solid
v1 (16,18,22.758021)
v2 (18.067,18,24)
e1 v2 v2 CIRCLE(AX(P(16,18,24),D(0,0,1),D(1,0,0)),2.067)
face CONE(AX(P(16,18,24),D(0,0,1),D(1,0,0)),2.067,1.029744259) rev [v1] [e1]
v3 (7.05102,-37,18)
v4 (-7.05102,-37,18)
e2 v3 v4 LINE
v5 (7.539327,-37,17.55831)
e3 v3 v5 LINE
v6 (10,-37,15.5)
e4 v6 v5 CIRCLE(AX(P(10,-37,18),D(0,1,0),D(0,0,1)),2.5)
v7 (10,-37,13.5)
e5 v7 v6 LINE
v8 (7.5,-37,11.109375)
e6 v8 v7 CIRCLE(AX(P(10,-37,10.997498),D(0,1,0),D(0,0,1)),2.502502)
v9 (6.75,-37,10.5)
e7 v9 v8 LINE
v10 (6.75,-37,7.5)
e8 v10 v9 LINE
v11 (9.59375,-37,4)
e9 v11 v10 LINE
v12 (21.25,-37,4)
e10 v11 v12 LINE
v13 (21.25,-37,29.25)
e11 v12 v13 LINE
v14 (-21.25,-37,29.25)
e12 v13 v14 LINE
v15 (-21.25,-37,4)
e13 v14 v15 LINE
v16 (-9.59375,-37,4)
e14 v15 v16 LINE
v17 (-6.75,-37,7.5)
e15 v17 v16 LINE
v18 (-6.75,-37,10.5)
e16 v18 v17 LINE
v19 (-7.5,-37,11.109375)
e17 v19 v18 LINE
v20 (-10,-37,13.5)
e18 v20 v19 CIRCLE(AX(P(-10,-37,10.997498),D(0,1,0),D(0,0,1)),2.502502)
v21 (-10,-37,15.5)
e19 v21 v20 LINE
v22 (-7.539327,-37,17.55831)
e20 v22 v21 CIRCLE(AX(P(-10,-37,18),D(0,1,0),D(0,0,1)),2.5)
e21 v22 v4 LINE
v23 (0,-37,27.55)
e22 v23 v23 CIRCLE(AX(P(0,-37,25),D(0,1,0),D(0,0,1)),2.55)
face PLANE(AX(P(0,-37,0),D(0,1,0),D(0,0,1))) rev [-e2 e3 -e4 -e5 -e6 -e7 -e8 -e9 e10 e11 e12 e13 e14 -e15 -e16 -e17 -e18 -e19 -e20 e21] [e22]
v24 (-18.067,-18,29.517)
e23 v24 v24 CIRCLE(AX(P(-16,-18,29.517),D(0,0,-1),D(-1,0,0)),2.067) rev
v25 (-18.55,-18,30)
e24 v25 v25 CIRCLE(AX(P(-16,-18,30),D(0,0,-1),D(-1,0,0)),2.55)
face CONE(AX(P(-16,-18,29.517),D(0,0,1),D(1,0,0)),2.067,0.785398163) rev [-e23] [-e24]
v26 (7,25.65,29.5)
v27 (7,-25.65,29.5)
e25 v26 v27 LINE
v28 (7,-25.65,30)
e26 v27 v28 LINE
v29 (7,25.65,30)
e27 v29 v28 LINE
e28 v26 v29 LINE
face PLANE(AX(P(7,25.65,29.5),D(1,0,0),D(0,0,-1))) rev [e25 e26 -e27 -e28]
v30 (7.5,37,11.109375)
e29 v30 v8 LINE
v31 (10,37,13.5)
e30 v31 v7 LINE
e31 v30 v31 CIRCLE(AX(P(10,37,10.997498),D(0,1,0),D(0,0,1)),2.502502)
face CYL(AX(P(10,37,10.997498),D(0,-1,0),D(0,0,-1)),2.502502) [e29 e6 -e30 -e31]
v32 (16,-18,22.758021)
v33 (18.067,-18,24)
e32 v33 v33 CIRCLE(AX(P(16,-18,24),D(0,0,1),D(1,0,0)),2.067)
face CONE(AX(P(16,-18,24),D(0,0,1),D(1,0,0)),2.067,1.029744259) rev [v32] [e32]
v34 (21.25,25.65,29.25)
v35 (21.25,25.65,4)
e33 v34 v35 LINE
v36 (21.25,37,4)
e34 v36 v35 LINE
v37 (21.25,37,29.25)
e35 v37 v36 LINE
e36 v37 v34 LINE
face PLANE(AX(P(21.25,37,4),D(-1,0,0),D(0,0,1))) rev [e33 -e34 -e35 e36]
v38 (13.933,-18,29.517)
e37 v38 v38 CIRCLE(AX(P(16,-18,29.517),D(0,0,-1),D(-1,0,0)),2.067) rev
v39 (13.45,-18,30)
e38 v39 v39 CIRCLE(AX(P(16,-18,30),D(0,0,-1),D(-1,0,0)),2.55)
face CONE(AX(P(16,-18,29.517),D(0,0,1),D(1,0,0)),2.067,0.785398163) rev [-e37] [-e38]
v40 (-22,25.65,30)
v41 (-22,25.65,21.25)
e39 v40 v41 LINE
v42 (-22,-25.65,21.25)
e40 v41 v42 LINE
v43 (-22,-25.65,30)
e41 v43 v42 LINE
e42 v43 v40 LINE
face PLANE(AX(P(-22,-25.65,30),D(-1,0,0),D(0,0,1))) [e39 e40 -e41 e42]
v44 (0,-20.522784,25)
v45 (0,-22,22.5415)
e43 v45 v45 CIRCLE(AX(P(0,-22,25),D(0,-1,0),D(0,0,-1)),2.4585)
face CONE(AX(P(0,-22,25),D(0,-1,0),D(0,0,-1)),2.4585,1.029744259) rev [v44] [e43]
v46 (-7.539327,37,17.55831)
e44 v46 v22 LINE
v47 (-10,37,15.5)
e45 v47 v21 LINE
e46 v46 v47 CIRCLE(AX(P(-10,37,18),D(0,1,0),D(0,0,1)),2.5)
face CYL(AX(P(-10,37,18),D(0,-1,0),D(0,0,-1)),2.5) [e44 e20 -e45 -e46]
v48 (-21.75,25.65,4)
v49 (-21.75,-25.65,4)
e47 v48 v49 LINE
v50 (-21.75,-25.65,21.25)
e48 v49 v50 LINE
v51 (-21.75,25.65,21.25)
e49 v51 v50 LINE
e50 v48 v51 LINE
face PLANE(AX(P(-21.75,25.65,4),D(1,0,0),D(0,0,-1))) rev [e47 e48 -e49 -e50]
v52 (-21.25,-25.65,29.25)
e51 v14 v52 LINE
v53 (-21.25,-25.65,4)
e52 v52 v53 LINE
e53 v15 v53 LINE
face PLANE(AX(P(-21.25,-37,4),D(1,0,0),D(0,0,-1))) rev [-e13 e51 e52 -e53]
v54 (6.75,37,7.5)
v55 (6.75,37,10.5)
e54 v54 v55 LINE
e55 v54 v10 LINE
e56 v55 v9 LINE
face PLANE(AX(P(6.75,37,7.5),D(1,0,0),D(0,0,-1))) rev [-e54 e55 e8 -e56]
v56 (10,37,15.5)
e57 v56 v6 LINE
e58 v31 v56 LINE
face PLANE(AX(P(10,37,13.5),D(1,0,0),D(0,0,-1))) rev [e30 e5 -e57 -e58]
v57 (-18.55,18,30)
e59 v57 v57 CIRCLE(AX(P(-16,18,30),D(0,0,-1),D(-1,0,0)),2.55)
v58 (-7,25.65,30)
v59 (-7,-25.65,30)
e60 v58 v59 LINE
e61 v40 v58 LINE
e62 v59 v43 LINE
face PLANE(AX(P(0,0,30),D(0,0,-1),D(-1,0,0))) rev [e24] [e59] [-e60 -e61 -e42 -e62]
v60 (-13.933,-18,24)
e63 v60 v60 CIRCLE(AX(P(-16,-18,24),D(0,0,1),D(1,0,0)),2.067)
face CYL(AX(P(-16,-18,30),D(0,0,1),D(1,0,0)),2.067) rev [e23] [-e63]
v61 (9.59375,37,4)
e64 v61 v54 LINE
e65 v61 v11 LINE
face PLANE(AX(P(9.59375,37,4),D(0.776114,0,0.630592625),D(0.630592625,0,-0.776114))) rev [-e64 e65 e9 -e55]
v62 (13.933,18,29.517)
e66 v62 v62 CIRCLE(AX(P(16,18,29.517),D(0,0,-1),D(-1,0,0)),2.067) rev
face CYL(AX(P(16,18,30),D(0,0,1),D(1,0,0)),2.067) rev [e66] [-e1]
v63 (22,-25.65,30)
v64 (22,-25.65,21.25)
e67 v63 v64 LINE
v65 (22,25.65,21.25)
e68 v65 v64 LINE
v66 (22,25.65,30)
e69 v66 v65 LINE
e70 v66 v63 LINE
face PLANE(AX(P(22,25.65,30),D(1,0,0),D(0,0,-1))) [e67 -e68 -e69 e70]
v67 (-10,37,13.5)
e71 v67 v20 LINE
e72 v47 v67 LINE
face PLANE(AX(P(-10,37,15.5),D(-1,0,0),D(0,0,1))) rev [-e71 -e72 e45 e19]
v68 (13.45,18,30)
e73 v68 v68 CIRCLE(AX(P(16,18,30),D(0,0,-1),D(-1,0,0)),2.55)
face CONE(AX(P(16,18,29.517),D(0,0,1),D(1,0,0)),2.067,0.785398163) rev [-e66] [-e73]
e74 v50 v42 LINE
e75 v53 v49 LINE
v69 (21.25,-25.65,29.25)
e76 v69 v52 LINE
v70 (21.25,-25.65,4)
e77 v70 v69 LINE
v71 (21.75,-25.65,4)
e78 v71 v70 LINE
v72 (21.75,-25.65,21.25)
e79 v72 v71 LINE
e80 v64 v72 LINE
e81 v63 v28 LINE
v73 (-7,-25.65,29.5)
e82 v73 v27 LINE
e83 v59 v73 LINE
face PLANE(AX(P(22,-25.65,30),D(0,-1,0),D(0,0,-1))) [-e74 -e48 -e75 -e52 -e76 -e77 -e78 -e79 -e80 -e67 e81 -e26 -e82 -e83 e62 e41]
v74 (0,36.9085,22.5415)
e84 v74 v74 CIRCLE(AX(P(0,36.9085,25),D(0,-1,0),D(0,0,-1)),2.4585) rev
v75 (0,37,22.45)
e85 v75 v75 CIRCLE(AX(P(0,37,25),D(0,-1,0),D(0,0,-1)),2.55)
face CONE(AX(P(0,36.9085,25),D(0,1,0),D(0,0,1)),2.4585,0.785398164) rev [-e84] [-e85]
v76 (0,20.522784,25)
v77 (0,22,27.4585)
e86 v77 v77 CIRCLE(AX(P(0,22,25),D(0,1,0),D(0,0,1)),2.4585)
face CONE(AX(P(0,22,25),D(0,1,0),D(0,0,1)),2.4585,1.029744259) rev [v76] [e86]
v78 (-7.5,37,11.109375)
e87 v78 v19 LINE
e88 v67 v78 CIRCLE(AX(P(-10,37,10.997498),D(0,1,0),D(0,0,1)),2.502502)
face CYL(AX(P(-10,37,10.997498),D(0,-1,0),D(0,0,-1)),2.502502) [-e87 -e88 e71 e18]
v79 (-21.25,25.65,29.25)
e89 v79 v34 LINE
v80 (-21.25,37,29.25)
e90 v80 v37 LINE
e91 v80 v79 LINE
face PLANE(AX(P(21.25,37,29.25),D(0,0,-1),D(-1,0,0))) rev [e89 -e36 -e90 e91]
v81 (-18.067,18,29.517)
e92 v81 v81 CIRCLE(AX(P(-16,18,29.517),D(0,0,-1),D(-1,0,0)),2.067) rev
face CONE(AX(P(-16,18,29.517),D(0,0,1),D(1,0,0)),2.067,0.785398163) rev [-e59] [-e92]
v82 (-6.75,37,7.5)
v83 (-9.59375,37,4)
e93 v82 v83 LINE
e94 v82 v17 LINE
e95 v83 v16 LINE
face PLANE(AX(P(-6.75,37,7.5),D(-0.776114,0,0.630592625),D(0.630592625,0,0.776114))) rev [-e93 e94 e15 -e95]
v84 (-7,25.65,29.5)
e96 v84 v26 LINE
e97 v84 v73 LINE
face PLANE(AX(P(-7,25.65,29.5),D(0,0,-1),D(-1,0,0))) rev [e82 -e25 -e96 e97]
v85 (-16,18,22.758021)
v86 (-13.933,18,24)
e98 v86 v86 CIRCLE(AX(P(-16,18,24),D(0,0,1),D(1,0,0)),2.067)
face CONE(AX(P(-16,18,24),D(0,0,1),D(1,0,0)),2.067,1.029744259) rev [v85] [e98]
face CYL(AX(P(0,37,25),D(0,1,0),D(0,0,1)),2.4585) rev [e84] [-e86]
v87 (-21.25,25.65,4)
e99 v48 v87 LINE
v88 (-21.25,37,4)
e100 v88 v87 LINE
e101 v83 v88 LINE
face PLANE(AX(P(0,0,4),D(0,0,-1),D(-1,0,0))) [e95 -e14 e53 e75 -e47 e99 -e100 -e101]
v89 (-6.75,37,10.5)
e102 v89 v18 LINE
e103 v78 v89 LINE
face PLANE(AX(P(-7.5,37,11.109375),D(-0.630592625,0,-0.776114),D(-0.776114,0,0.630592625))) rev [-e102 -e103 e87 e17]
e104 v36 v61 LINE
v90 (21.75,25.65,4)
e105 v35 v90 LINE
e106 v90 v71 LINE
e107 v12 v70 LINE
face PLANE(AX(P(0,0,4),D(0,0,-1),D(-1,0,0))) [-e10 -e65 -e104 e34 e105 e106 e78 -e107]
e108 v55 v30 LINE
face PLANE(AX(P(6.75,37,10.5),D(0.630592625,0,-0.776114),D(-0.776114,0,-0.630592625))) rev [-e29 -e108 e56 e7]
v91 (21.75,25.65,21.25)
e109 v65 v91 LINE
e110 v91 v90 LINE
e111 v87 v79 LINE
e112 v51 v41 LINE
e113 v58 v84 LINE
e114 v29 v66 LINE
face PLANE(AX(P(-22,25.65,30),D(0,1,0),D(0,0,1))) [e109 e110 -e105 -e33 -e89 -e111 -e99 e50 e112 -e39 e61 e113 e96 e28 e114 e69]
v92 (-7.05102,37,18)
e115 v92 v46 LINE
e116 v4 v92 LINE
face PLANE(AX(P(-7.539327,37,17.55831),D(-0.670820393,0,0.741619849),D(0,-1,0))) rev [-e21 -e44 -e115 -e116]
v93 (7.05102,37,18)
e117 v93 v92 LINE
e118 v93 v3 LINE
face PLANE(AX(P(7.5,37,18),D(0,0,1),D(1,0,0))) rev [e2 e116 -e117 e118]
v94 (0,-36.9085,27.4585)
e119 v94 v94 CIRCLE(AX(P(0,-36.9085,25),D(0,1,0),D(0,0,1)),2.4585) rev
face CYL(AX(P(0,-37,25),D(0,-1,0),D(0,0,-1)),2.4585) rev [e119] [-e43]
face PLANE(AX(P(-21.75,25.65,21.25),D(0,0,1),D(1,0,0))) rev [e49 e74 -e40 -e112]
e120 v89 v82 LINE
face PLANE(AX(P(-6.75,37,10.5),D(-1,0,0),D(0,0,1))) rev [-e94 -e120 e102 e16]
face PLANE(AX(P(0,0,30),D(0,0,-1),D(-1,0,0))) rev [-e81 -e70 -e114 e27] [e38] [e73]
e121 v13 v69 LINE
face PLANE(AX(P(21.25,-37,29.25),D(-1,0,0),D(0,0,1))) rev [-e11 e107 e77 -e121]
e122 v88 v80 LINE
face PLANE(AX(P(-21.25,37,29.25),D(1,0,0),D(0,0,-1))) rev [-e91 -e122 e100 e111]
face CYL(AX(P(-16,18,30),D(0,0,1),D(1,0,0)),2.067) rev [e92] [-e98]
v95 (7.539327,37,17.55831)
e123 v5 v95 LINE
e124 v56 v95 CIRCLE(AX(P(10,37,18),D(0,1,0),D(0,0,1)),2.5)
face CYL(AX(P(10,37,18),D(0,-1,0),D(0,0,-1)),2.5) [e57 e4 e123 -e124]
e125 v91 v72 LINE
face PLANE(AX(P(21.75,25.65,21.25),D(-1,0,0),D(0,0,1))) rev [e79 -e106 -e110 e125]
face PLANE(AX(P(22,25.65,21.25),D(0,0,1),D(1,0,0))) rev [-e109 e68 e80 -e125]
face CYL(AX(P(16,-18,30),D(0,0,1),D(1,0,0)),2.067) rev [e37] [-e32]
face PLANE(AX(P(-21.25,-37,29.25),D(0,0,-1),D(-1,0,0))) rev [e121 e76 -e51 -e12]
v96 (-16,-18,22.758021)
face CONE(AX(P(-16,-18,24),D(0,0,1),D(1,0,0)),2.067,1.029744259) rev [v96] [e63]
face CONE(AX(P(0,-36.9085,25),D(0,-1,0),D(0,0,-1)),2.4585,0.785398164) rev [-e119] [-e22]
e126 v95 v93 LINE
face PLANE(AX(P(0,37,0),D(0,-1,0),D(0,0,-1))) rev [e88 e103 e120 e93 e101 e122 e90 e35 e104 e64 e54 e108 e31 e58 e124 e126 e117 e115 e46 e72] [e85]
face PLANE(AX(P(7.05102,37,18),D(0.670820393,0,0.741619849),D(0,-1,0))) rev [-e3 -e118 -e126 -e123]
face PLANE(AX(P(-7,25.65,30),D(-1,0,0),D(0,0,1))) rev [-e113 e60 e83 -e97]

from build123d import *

# Parameters (mm, degrees)
SKIZZE1_W                       = 44
SKIZZE1_H                       = 51.3
AUFSATZ_LINEAR_AUSTRAGEN1_DEPTH = 26
SKIZZE2_W                       = 0.25
SKIZZE2_H                       = 17.25
SCHNITT_LINEAR_AUSTRAGEN1_DEPTH = 64.369472146
SKIZZE3_W                       = 14
SKIZZE3_H                       = 0.5
SCHNITT_LINEAR_AUSTRAGEN2_DEPTH = 64.369472146
SKIZZE4_W                       = 0.25
SKIZZE4_H                       = 17.25
SCHNITT_LINEAR_AUSTRAGEN3_DEPTH = 51.3
SKIZZE5_W                       = 42.5
SKIZZE5_H                       = 25.25
AUFSATZ_LINEAR_AUSTRAGEN2_DEPTH = 11.35
SKIZZE6_W                       = 42.5
SKIZZE6_H                       = 25.25
AUFSATZ_LINEAR_AUSTRAGEN3_DEPTH = 11.35
SCHNITT_LINEAR_AUSTRAGEN4_DEPTH = 83.825116963
BOHRUNG1_D                      = 4.917
BOHRUNG1_DEPTH                  = 15
BOHRUNG1_TIP                    = 1.477215832
BOHRUNG2_D                      = 4.917
BOHRUNG2_DEPTH                  = 15
BOHRUNG2_TIP                    = 1.477215832
DURCHGANGSLOCH_F_R_M3_51_D      = 4.134
DURCHGANGSLOCH_F_R_M3_51_DEPTH  = 6
DURCHGANGSLOCH_F_R_M3_51_TIP    = 1.2419789
FASE1_SIZE                      = 0.483
FASE2_SIZE                      = 0.448979592
FASE3_SIZE                      = 0.0915
FASE4_SIZE                      = 0.448979592


with BuildPart() as part:
    # Skizze1 → Aufsatz-Linear austragen1 (new body)
    with BuildSketch(Plane(origin=(0, 0, 4), x_dir=(-1, 0, 0), z_dir=(0, 0, -1))):
        Rectangle(SKIZZE1_W, SKIZZE1_H)
    extrude(amount=-AUFSATZ_LINEAR_AUSTRAGEN1_DEPTH)

    # Skizze2 → Schnitt-Linear austragen1 (cut, through all)
    with BuildSketch(Plane.XZ.offset(25.65)):
        with Locations((-21.875, 12.625)):
            Rectangle(SKIZZE2_W, SKIZZE2_H)
    extrude(amount=-SCHNITT_LINEAR_AUSTRAGEN1_DEPTH, mode=Mode.SUBTRACT)

    # Skizze3 → Schnitt-Linear austragen2 (cut, through all)
    with BuildSketch(Plane.XZ.offset(25.65)):
        with Locations((0, 29.75)):
            Rectangle(SKIZZE3_W, SKIZZE3_H)
    extrude(amount=-SCHNITT_LINEAR_AUSTRAGEN2_DEPTH, mode=Mode.SUBTRACT)

    # Skizze4 → Schnitt-Linear austragen3 (cut)
    with BuildSketch(Plane.XZ.offset(25.65)):
        with Locations((21.875, 12.625)):
            Rectangle(SKIZZE4_W, SKIZZE4_H)
    extrude(amount=-SCHNITT_LINEAR_AUSTRAGEN3_DEPTH, mode=Mode.SUBTRACT)

    # Skizze5 → Aufsatz-Linear austragen2 (add)
    with BuildSketch(Plane(origin=(0, 25.65, 0), x_dir=(-1, 0, 0), z_dir=(0, 1, 0))):
        with Locations((0, 16.625)):
            Rectangle(SKIZZE5_W, SKIZZE5_H)
    extrude(amount=AUFSATZ_LINEAR_AUSTRAGEN2_DEPTH)

    # Skizze6 → Aufsatz-Linear austragen3 (add)
    with BuildSketch(Plane.XZ.offset(25.65)):
        with Locations((0, 16.625)):
            Rectangle(SKIZZE6_W, SKIZZE6_H)
    extrude(amount=AUFSATZ_LINEAR_AUSTRAGEN3_DEPTH)

    # Skizze7 → Schnitt-Linear austragen4 (cut, through all)
    with BuildSketch(Plane.XZ.offset(37)):
        with BuildLine():
            Line((-9.59375, 4), (9.59375, 4))
            Line((9.59375, 4), (6.75, 7.5))
            Line((6.75, 7.5), (6.75, 10.5))
            Line((6.75, 10.5), (7.5, 11.109375))
            ThreePointArc((7.5, 11.109375), (8.270470592, 12.806156162), (10, 13.5))
            Line((10, 13.5), (10, 15.5))
            ThreePointArc((10, 15.5), (8.232233047, 16.232233047), (7.5, 18))
            Line((7.5, 18), (-7.5, 18))
            ThreePointArc((-7.5, 18), (-8.232233047, 16.232233047), (-10, 15.5))
            Line((-10, 15.5), (-10, 13.5))
            ThreePointArc((-10, 13.5), (-8.270470592, 12.806156162), (-7.5, 11.109375))
            Line((-7.5, 11.109375), (-6.75, 10.5))
            Line((-6.75, 10.5), (-6.75, 7.5))
            Line((-6.75, 7.5), (-9.59375, 4))
        make_face()
    extrude(amount=-SCHNITT_LINEAR_AUSTRAGEN4_DEPTH, mode=Mode.SUBTRACT)

    # Bohrung1
    with Locations(Plane(origin=(0, -37, 0), x_dir=(-1, 0, 0), z_dir=(0, -1, 0))):
        with Locations((0, -25)):
            Hole(BOHRUNG1_D / 2, depth=BOHRUNG1_DEPTH)
            with Locations((0, 0, -(BOHRUNG1_DEPTH + BOHRUNG1_TIP / 2))):  # 118° drill point
                Cone(0, BOHRUNG1_D / 2, BOHRUNG1_TIP, mode=Mode.SUBTRACT)

    # Bohrung2
    with Locations(Plane(origin=(0, 37, 0), x_dir=(1, 0, 0), z_dir=(0, 1, 0))):
        with Locations((0, -25)):
            Hole(BOHRUNG2_D / 2, depth=BOHRUNG2_DEPTH)
            with Locations((0, 0, -(BOHRUNG2_DEPTH + BOHRUNG2_TIP / 2))):  # 118° drill point
                Cone(0, BOHRUNG2_D / 2, BOHRUNG2_TIP, mode=Mode.SUBTRACT)

    # Durchgangsloch für M3.51
    with Locations(Plane.XY.offset(30)):
        with Locations((16, -18), (16, 18), (-16, 18), (-16, -18)):
            Hole(DURCHGANGSLOCH_F_R_M3_51_D / 2, depth=DURCHGANGSLOCH_F_R_M3_51_DEPTH)
            with Locations((0, 0, -(DURCHGANGSLOCH_F_R_M3_51_DEPTH + DURCHGANGSLOCH_F_R_M3_51_TIP / 2))):  # 118° drill point
                Cone(0, DURCHGANGSLOCH_F_R_M3_51_D / 2, DURCHGANGSLOCH_F_R_M3_51_TIP, mode=Mode.SUBTRACT)

    # Fase1
    fase1_edges = [part.edges().sort_by_distance(p)[0] for p in [
        (-13.933, -18, 30),
        (-13.933, 18, 30),
        (18.067, 18, 30),
        (18.067, -18, 30),
    ]]
    chamfer(fase1_edges, length=FASE1_SIZE)

    # Fase2
    # the kernel refuses this chamfer: 0.448979592, 0.406117321 mm, written as the material it adds along each edge
    with BuildSketch(Plane(origin=(-7.5, -37, 18), x_dir=(1, 0, 0), z_dir=(0, 1, 0))) as fase2_piece_1:
        with BuildLine():
            Line((FASE2_SIZE, 0), (-0.03932739, 0.441690284))
            ThreePointArc((-0.03932739, 0.441690284), (-0.010448273, 0.22832477), (0, 0))
            Line((0, 0), (FASE2_SIZE, 0))
        make_face()
    extrude(amount=74)

    # Fase3
    fase3_edges = [part.edges().sort_by_distance(p)[0] for p in [
        (-2.4585, -37, 25),
        (2.4585, 37, 25),
    ]]
    chamfer(fase3_edges, length=FASE3_SIZE)

    # Fase4
    # the kernel refuses this chamfer: 0.448979592, 0.406117321 mm, written as the material it adds along each edge
    with BuildSketch(Plane(origin=(7.5, -37, 18), x_dir=(0.08868753028202897, 0, -0.9960594972050988), z_dir=(0, 1, 0))) as fase4_piece_1:
        with BuildLine():
            Line((0.443437651, 0), (-FASE4_SIZE * 0.0886875302498, FASE4_SIZE * 0.996059496843))
            Line((-FASE4_SIZE * 0.0886875302498, FASE4_SIZE * 0.996059496843), (0, 0))
            ThreePointArc((0, 0), (0.228351687, 0.009842458), (0.443437651, 0))
        make_face()
    extrude(amount=74)


solid = part.part
